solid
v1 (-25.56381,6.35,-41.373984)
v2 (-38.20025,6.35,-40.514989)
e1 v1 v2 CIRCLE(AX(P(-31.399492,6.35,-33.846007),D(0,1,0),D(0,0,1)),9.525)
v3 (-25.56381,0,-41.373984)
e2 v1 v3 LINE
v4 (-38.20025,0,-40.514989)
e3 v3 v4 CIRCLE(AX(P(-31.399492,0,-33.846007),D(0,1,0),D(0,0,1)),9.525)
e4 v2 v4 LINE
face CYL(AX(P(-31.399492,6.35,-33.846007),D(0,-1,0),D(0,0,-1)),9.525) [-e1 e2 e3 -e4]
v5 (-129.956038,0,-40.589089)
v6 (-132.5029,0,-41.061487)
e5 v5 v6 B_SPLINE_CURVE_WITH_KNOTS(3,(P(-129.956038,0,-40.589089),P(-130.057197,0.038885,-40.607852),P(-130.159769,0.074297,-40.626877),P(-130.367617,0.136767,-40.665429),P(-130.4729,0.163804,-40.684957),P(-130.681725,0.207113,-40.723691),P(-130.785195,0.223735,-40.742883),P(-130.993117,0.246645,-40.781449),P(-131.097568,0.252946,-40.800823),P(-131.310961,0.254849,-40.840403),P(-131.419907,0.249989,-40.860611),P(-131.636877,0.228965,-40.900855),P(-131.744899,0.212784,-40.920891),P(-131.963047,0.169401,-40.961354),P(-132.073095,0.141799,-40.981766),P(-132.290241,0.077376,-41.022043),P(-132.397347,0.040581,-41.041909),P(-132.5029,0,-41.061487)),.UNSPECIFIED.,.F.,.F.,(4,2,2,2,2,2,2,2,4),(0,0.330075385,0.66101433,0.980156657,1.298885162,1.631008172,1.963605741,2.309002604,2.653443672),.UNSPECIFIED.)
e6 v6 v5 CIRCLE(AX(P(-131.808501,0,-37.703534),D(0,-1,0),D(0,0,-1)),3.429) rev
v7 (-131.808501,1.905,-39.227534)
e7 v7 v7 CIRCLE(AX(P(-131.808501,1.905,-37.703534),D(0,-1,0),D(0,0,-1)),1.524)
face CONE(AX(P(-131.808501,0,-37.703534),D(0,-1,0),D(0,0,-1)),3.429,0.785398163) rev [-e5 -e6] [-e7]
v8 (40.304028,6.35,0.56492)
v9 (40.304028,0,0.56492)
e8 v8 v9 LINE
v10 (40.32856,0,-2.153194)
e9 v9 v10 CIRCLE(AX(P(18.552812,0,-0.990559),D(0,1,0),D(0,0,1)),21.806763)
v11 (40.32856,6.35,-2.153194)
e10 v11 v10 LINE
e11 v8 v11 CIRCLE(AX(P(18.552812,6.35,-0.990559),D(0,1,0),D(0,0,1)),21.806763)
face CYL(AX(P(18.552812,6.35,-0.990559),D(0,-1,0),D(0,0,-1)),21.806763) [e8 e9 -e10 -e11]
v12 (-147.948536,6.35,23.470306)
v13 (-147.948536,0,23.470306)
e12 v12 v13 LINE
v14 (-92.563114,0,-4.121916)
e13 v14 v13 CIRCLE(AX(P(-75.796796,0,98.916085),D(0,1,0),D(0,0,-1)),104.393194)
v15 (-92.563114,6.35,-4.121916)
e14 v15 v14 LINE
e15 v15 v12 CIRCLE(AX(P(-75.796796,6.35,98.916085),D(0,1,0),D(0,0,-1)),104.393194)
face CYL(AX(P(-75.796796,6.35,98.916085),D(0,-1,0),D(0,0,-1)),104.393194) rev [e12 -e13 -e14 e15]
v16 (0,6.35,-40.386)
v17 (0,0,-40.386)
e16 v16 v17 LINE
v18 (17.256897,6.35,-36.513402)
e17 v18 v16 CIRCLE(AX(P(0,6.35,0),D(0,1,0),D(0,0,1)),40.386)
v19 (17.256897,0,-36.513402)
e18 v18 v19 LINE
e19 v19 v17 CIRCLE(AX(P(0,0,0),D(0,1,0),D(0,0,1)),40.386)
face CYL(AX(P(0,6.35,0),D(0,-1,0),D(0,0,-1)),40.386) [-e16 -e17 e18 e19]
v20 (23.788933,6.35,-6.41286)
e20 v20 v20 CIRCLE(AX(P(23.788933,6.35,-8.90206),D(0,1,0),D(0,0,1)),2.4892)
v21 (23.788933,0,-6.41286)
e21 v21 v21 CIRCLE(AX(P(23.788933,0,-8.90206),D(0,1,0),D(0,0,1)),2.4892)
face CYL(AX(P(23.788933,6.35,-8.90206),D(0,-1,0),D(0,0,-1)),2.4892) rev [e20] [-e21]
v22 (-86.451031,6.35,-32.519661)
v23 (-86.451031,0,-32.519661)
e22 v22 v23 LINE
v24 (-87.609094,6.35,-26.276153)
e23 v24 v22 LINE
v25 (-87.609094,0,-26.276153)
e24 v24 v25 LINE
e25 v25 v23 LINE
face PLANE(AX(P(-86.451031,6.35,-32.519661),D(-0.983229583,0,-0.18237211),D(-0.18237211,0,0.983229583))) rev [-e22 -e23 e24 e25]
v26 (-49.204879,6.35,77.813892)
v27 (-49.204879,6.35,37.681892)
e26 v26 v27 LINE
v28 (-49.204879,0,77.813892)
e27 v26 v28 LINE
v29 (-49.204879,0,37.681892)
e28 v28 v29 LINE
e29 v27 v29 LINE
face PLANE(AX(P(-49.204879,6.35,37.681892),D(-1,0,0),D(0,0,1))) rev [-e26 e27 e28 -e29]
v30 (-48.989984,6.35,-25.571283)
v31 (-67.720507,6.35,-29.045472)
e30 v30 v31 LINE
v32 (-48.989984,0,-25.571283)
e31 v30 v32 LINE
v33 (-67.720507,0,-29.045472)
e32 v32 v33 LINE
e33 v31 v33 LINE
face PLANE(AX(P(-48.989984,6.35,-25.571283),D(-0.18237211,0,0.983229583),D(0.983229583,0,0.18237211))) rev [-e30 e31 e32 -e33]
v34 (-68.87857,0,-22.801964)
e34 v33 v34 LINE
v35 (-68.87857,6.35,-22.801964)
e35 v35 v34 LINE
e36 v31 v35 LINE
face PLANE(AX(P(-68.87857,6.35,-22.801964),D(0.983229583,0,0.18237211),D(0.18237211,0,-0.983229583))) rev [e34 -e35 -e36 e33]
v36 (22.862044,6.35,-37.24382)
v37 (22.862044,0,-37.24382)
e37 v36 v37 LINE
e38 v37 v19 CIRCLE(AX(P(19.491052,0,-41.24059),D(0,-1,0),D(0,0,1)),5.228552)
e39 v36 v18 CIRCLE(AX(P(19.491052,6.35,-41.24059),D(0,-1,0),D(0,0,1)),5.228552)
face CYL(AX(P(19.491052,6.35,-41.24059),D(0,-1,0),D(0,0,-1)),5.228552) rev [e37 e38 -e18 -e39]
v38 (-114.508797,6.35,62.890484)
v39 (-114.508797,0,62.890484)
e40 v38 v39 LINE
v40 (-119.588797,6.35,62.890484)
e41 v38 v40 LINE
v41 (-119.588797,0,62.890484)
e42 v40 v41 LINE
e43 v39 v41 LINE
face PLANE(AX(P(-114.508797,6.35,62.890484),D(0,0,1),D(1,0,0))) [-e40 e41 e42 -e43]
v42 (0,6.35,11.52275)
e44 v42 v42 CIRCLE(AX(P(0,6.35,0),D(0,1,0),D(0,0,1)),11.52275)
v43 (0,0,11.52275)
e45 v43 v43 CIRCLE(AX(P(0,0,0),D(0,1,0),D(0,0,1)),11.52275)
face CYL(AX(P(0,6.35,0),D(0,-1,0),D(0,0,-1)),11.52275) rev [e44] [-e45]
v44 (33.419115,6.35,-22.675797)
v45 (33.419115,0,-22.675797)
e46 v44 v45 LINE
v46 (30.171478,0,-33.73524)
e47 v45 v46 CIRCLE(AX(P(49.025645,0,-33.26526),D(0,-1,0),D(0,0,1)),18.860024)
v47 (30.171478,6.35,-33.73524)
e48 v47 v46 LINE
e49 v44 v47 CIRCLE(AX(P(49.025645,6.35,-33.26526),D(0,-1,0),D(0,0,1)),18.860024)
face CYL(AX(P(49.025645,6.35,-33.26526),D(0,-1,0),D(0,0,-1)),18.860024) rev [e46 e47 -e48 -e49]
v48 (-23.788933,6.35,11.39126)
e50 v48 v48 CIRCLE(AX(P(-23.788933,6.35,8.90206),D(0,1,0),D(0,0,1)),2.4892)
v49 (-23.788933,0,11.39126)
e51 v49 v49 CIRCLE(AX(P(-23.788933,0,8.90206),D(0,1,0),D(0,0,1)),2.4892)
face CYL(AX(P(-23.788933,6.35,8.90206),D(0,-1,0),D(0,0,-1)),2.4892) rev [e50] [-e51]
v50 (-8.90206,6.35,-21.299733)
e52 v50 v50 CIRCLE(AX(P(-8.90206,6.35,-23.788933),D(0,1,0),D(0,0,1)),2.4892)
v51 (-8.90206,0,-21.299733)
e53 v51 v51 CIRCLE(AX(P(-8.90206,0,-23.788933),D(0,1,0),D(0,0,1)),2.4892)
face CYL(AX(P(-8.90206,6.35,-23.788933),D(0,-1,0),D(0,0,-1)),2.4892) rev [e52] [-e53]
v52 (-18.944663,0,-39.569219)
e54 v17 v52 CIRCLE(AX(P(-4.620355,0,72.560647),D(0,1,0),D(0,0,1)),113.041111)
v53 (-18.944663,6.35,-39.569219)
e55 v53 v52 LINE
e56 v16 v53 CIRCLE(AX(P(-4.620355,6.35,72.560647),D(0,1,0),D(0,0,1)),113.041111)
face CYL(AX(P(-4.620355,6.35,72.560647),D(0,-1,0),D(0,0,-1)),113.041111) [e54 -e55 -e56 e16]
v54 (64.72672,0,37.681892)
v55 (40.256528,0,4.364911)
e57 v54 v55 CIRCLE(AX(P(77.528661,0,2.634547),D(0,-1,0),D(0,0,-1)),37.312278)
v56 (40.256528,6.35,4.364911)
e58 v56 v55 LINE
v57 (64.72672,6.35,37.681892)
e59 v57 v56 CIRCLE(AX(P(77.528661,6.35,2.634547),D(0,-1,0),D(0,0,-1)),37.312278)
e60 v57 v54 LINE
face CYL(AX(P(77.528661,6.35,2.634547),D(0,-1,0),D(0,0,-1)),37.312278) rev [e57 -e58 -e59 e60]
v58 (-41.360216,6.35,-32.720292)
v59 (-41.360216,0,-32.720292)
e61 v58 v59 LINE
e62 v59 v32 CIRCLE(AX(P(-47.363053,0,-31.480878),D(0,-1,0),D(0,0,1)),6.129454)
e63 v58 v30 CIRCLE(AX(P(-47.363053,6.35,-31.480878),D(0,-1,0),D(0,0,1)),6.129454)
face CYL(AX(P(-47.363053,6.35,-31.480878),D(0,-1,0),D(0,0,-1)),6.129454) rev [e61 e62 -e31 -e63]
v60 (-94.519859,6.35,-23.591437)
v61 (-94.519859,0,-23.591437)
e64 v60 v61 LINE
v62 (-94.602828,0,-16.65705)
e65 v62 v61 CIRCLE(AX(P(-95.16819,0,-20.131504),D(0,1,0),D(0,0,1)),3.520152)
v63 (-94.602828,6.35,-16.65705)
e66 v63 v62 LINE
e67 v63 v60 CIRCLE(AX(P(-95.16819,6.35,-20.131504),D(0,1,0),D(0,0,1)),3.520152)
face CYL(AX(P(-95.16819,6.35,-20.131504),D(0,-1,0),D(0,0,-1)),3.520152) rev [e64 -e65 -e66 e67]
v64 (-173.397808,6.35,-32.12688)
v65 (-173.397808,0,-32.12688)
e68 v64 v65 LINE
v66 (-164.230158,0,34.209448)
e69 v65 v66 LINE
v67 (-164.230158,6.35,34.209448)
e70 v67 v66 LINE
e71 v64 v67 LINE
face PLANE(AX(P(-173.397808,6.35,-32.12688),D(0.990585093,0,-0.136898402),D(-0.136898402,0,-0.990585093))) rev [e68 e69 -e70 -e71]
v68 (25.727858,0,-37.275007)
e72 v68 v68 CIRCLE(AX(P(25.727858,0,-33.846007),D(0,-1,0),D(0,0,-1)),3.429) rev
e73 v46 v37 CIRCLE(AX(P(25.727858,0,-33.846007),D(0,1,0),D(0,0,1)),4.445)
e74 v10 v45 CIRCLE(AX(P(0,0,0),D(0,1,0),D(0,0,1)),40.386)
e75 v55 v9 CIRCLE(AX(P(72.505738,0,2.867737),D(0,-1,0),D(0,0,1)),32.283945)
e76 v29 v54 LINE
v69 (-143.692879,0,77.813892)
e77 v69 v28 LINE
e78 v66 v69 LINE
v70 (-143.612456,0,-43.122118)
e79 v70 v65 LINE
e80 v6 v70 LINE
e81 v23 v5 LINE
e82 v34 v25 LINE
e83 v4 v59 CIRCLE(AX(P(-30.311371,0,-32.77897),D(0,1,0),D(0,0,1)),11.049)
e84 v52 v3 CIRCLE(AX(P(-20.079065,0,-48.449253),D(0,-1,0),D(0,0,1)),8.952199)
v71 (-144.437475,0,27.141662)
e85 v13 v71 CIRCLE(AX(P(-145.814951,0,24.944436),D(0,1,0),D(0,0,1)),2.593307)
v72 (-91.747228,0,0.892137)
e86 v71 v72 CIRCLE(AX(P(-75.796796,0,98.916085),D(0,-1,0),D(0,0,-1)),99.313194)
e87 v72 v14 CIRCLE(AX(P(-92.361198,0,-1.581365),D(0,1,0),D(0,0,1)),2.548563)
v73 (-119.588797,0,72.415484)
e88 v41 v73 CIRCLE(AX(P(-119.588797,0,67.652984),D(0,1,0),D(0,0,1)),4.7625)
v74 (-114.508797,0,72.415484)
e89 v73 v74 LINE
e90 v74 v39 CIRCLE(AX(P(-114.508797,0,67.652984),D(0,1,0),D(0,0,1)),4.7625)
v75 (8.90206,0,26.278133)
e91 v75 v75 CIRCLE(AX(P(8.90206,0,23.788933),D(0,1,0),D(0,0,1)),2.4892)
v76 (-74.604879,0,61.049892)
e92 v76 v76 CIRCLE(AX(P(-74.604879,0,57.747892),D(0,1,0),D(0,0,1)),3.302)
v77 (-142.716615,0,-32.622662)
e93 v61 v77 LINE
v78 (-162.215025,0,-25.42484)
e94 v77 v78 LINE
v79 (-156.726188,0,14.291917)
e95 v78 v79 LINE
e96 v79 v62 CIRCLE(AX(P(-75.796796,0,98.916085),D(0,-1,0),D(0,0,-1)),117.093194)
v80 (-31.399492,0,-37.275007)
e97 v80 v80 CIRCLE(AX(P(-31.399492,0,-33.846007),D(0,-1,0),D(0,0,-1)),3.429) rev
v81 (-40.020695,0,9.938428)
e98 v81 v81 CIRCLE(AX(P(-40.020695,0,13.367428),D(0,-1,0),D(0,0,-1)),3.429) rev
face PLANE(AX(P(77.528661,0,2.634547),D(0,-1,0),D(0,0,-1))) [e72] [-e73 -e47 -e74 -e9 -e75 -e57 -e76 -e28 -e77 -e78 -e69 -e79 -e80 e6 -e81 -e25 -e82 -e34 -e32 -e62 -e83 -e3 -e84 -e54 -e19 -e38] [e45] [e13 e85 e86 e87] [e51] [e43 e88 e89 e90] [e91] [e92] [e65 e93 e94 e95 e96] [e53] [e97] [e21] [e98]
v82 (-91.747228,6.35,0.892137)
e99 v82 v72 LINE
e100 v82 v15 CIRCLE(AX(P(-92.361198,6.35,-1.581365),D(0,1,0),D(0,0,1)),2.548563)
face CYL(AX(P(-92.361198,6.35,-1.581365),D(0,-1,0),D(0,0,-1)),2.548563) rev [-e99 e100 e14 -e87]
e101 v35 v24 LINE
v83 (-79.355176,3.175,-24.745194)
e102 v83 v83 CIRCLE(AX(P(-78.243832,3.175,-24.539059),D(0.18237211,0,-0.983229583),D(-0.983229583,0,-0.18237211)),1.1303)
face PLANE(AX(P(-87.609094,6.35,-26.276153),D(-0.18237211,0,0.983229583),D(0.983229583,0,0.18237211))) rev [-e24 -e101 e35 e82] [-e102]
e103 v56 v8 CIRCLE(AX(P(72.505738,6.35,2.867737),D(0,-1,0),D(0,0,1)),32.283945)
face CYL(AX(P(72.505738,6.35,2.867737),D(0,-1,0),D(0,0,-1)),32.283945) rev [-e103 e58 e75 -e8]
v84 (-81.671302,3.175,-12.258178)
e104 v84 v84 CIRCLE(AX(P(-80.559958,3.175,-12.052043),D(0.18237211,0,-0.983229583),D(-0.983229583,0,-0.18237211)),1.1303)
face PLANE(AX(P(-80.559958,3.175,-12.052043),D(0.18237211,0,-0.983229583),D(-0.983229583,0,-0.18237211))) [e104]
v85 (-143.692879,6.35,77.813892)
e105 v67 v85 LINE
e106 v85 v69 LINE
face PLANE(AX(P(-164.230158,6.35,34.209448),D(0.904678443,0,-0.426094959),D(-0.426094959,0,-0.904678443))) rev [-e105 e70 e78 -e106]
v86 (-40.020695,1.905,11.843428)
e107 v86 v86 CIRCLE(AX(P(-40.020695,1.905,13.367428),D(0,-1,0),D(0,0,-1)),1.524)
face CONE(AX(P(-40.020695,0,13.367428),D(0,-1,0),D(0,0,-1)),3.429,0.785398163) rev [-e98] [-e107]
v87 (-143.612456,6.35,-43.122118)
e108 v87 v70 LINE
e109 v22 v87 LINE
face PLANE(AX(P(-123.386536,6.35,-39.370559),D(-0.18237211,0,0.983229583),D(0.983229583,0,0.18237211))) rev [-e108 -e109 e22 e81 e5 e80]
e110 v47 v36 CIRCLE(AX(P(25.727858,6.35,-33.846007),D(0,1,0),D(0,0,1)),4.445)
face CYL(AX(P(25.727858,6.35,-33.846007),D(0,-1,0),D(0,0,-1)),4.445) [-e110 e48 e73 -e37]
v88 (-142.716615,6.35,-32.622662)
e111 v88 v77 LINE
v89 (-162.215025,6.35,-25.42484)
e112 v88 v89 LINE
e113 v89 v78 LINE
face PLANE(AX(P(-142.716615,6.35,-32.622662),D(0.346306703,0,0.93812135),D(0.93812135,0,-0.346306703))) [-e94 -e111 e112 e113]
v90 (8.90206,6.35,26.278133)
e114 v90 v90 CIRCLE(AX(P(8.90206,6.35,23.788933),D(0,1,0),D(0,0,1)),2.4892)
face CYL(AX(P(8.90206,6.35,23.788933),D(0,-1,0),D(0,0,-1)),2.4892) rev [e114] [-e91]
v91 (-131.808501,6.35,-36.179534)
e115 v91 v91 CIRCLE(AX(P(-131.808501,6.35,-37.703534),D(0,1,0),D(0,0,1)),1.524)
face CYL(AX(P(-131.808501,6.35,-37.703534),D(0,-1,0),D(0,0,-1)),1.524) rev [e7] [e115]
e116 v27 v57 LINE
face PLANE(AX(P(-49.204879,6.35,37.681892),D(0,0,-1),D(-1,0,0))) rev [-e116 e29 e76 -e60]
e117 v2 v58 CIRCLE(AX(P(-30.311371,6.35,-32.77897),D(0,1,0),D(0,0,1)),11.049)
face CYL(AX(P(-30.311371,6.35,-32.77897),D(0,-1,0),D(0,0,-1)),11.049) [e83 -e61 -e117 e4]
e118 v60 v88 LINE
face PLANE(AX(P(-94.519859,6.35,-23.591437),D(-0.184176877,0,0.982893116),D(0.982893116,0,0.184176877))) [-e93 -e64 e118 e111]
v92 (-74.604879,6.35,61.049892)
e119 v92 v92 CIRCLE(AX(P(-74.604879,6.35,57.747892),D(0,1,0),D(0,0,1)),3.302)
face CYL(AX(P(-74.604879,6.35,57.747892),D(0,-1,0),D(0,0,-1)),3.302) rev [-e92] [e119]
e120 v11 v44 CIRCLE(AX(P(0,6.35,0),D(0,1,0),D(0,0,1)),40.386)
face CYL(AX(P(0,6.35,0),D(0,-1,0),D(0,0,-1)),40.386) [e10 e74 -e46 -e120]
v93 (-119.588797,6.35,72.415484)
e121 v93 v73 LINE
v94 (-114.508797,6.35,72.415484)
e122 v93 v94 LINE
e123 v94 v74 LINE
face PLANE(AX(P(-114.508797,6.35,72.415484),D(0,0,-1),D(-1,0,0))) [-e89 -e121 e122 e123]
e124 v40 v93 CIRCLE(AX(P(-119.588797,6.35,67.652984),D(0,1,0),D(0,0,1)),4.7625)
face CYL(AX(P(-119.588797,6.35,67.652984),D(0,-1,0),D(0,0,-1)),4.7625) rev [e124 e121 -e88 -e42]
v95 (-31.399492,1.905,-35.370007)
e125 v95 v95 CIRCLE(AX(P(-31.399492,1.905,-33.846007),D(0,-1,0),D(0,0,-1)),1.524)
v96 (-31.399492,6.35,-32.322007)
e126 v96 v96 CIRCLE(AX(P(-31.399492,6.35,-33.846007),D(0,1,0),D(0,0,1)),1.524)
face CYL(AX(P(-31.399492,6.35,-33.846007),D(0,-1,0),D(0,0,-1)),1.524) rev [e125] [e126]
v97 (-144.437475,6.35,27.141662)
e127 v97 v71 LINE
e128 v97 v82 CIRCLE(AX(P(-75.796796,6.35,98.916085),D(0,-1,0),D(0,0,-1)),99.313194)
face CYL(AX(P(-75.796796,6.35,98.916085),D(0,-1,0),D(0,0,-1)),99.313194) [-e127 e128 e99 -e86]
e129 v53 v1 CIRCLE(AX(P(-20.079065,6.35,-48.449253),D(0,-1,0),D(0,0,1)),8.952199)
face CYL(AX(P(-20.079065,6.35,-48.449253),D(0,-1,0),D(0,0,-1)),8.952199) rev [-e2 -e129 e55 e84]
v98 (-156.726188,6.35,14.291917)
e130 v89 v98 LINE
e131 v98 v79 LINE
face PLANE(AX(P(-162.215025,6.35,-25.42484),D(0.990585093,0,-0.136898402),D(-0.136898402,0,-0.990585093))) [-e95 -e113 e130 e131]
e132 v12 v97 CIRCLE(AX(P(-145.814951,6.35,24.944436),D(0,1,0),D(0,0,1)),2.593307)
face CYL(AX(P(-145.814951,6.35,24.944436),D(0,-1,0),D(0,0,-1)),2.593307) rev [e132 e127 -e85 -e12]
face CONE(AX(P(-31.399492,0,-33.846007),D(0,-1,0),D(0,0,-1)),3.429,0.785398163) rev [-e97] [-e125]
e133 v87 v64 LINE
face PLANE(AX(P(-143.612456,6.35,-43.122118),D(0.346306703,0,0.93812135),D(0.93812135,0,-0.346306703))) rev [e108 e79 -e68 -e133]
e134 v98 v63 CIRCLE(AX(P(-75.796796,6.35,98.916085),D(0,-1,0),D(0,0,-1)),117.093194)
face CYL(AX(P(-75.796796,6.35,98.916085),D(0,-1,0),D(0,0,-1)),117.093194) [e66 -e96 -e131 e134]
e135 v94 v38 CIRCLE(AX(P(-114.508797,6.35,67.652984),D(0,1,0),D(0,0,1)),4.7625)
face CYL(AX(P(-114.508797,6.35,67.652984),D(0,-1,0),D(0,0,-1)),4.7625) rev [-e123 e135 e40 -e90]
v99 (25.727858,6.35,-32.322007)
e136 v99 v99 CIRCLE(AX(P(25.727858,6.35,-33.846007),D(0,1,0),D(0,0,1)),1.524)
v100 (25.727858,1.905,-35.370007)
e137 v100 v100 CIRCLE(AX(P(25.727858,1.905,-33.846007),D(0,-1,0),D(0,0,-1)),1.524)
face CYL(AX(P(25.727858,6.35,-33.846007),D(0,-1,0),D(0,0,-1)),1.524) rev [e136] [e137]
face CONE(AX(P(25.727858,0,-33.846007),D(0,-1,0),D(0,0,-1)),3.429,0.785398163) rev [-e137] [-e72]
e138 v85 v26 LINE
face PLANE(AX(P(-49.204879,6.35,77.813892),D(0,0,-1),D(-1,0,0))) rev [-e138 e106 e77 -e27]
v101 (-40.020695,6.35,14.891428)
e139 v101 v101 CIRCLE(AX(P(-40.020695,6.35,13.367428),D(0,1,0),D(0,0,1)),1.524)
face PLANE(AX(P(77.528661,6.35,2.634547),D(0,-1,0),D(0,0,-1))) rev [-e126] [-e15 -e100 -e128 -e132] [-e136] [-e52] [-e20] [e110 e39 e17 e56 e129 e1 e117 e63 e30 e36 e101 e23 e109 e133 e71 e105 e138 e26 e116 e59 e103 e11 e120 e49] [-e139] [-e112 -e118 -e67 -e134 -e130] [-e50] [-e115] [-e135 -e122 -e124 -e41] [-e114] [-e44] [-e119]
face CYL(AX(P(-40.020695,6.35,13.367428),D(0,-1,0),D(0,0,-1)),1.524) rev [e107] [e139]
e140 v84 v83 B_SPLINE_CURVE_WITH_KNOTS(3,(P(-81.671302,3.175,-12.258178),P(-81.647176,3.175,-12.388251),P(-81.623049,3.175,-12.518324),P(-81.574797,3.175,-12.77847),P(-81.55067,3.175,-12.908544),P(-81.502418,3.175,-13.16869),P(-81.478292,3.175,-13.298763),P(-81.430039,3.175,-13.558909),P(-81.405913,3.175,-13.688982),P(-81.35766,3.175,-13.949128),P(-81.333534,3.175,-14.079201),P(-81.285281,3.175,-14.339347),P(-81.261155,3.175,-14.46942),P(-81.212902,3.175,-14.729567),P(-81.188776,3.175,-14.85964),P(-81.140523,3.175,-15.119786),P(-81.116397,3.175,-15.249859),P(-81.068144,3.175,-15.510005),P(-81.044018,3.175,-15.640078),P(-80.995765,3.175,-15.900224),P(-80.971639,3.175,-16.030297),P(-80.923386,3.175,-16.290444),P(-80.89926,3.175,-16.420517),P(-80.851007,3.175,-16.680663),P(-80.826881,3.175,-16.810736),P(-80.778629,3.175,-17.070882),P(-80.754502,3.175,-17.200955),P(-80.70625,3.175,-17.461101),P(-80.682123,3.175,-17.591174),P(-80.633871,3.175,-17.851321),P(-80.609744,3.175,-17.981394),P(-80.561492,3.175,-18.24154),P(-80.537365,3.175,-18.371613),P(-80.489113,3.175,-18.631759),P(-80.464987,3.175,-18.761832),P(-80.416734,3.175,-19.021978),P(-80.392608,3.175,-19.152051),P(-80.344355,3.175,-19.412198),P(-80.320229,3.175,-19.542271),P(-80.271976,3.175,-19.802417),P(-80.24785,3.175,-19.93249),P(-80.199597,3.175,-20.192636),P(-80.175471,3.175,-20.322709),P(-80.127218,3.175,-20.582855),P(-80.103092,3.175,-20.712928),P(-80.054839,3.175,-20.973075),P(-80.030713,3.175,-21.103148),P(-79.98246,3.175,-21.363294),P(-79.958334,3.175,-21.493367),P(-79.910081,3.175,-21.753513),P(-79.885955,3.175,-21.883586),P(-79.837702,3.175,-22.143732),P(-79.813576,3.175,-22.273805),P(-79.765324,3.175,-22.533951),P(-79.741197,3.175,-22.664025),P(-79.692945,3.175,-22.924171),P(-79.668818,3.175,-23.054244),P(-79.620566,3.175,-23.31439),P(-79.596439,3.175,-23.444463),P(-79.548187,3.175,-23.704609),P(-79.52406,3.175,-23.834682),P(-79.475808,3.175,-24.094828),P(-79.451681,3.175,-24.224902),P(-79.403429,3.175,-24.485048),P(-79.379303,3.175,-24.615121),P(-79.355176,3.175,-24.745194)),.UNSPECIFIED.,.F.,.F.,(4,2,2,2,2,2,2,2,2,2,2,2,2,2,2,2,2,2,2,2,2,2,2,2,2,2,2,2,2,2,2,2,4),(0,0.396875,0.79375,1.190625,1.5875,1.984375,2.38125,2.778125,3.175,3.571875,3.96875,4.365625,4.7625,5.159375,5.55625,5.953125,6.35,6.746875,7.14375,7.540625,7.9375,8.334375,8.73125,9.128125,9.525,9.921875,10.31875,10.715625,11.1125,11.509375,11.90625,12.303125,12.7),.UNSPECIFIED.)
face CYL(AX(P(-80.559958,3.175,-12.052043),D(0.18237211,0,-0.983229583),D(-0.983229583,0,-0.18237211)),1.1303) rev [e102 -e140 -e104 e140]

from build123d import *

# Parameters (mm, degrees)
SKETCH1_R           = 1.524
SKETCH1_R_2         = 2.4892
SKETCH1_R_3         = 11.522750336
SKETCH1_R_4         = 3.302
BOSS_EXTRUDE1_DEPTH = 6.35
CHAMFER1_SIZE       = 1.905
SKETCH2_R           = 1.1303
CUT_EXTRUDE1_DEPTH  = 12.7


with BuildPart() as part:
    # Sketch1 → Boss-Extrude1 (new body)
    with BuildSketch(Plane(origin=(0, 0, 0), x_dir=(1, 0, 0), z_dir=(0, 1, 0))):
        with BuildLine():
            Line((-48.989983611, 25.571283439), (-67.720507172, 29.04547214))
            Line((-67.720507172, 29.04547214), (-68.878570072, 22.801964286))
            Line((-68.878570072, 22.801964286), (-87.609093633, 26.276152988))
            Line((-87.609093633, 26.276152988), (-86.451030733, 32.519660841))
            Line((-86.451030733, 32.519660841), (-105.181554294, 35.993849543))
            Line((-105.181554294, 35.993849543), (-123.386535507, 39.370559213))
            Line((-123.386535507, 39.370559213), (-143.61245558, 43.122118146))
            Line((-143.61245558, 43.122118146), (-173.397808446, 32.126880331))
            Line((-173.397808446, 32.126880331), (-164.230158466, -34.209448348))
            Line((-164.230158466, -34.209448348), (-143.692879271, -77.813892282))
            Line((-143.692879271, -77.813892282), (-76.563330949, -77.813892282))
            Line((-76.563330949, -77.813892282), (-49.204879271, -77.813892282))
            Line((-49.204879271, -77.813892282), (-49.204879271, -37.681892282))
            Line((-49.204879271, -37.681892282), (45.277962712, -37.681892282))
            Line((45.277962712, -37.681892282), (64.72671994, -37.681892282))
            ThreePointArc((64.72671994, -37.681892282), (47.456106683, -24.721818432), (40.256527969, -4.364911427))
            ThreePointArc((40.256527969, -4.364911427), (40.224315343, -2.464216219), (40.304028245, -0.564920092))
            ThreePointArc((40.304028245, -0.564920092), (40.358687129, 0.79375425), (40.328560009, 2.153193811))
            ThreePointArc((40.328560009, 2.153193811), (38.274981353, 12.886225143), (33.41911498, 22.675796566))
            ThreePointArc((33.41911498, 22.675796566), (30.929713329, 27.951337515), (30.171477502, 33.73524029))
            ThreePointArc((30.171477502, 33.73524029), (27.651370411, 37.853265988), (22.862043617, 37.243820127))
            ThreePointArc((22.862043617, 37.243820127), (20.166682607, 36.055874133), (17.256896531, 36.513401897))
            ThreePointArc((17.256896531, 36.513401897), (8.843040964, 39.405959226), (0, 40.386))
            ThreePointArc((0, 40.386), (-9.489488111, 40.375548652), (-18.94466273, 39.569219451))
            ThreePointArc((-18.94466273, 39.569219451), (-22.43398811, 39.812343861), (-25.563809609, 41.373983535))
            ThreePointArc((-25.563809609, 41.373983535), (-32.045487778, 43.349075748), (-38.20024979, 40.514989348))
            ThreePointArc((-38.20024979, 40.514989348), (-40.550934903, 36.930082806), (-41.360215512, 32.720291801))
            ThreePointArc((-41.360215512, 32.720291801), (-43.17208429, 27.008072674), (-48.989983611, 25.571283439))
        make_face()
        with Locations(Location((-131.808500509, 37.703534036, 0), (0, 0, 270))):
            Circle(SKETCH1_R, mode=Mode.SUBTRACT)
        with Locations(Location((-31.399492492, 33.846007028, 0), (0, 0, 270))):
            Circle(SKETCH1_R, mode=Mode.SUBTRACT)
        with Locations(Location((-23.788932991, -8.902059713, 0), (0, 0, 270))):
            Circle(SKETCH1_R_2, mode=Mode.SUBTRACT)
        with Locations(Location((8.902059713, -23.788932991, 0), (0, 0, 270))):
            Circle(SKETCH1_R_2, mode=Mode.SUBTRACT)
        with Locations(Location((-8.902059713, 23.788932991, 0), (0, 0, 270))):
            Circle(SKETCH1_R_2, mode=Mode.SUBTRACT)
        with Locations(Location((23.788932991, 8.902059713, 0), (0, 0, 270))):
            Circle(SKETCH1_R_2, mode=Mode.SUBTRACT)
        with Locations(Location((0, 0, 0), (0, 0, 270))):
            Circle(SKETCH1_R_3, mode=Mode.SUBTRACT)
        with Locations(Location((-74.604879271, -57.747892282, 0), (0, 0, 270))):
            Circle(SKETCH1_R_4, mode=Mode.SUBTRACT)
        with Locations(Location((-40.020695033, -13.367428306, 0), (0, 0, 270))):
            Circle(SKETCH1_R, mode=Mode.SUBTRACT)
        with Locations(Location((25.727857837, 33.846007028, 0), (0, 0, 270))):
            Circle(SKETCH1_R, mode=Mode.SUBTRACT)
        with BuildLine():
            Line((-142.716614997, 32.622661546), (-162.215024972, 25.424839998))
            Line((-162.215024972, 25.424839998), (-156.726187504, -14.291916991))
            ThreePointArc((-156.726187504, -14.291916991), (-128.01028366, 5.891204618), (-94.602827713, 16.657049623))
            ThreePointArc((-94.602827713, 16.657049623), (-91.648290045, 20.089389422), (-94.519859105, 23.59143746))
            Line((-94.519859105, 23.59143746), (-142.716614997, 32.622661546))
        make_face(mode=Mode.SUBTRACT)
        with BuildLine():
            Line((-114.508797405, -72.415483536), (-119.588797405, -72.415483536))
            ThreePointArc((-119.588797405, -72.415483536), (-124.351297405, -67.652983536), (-119.588797405, -62.890483536))
            Line((-119.588797405, -62.890483536), (-114.508797405, -62.890483536))
            ThreePointArc((-114.508797405, -62.890483536), (-109.746297405, -67.652983536), (-114.508797405, -72.415483536))
        make_face(mode=Mode.SUBTRACT)
        with BuildLine():
            ThreePointArc((-147.948535824, -23.470306336), (-122.347176599, -5.47625853), (-92.563113904, 4.121916294))
            ThreePointArc((-92.563113904, 4.121916294), (-89.845720269, 1.990682905), (-91.74722838, -0.892137038))
            ThreePointArc((-91.74722838, -0.892137038), (-120.081933775, -10.023243789), (-144.437475152, -27.141662075))
            ThreePointArc((-144.437475152, -27.141662075), (-147.689154448, -26.736809805), (-147.948535824, -23.470306336))
        make_face(mode=Mode.SUBTRACT)
    extrude(amount=BOSS_EXTRUDE1_DEPTH)

    # Chamfer1
    # the kernel refuses this chamfer: 1.905 mm, written as the material it takes off along each edge
    with BuildSketch(Plane(origin=(-131.808500509, 0, -37.703534036), x_dir=(0, 0, 1), z_dir=(-1, 0, 0))) as chamfer1_piece_1:
        Polygon((1.524, CHAMFER1_SIZE), (1.524 + CHAMFER1_SIZE, 0), (1.524, 0), align=None)
    revolve(axis=Axis((-131.808500509, 0, -37.703534036), (0, 1, 0)), mode=Mode.SUBTRACT)
    with BuildSketch(Plane(origin=(-40.020695033, 0, 13.367428306), x_dir=(0, 0, 1), z_dir=(-1, 0, 0))) as chamfer1_piece_2:
        Polygon((1.524, CHAMFER1_SIZE), (1.524 + CHAMFER1_SIZE, 0), (1.524, 0), align=None)
    revolve(axis=Axis((-40.020695033, 0, 13.367428306), (0, 1, 0)), mode=Mode.SUBTRACT)
    with BuildSketch(Plane(origin=(25.727857837, 0, -33.846007028), x_dir=(0, 0, 1), z_dir=(-1, 0, 0))) as chamfer1_piece_3:
        Polygon((1.524, CHAMFER1_SIZE), (1.524 + CHAMFER1_SIZE, 0), (1.524, 0), align=None)
    revolve(axis=Axis((25.727857837, 0, -33.846007028), (0, 1, 0)), mode=Mode.SUBTRACT)
    with BuildSketch(Plane(origin=(-31.399492492, 0, -33.846007028), x_dir=(0, 0, 1), z_dir=(-1, 0, 0))) as chamfer1_piece_4:
        Polygon((1.524, CHAMFER1_SIZE), (1.524 + CHAMFER1_SIZE, 0), (1.524, 0), align=None)
    revolve(axis=Axis((-31.399492492, 0, -33.846007028), (0, 1, 0)), mode=Mode.SUBTRACT)

    # Sketch2 → Cut-Extrude1 (cut)
    with BuildSketch(Plane(origin=(1.797830768, 0, -9.692712298), x_dir=(-0.9832295832535866, 0, -0.18237211029918626), z_dir=(0.18237211029918626, 0, -0.9832295832535866))):
        with Locations((81.406890093, 3.175)):
            Circle(SKETCH2_R)
    extrude(amount=-CUT_EXTRUDE1_DEPTH, mode=Mode.SUBTRACT)


solid = part.part
